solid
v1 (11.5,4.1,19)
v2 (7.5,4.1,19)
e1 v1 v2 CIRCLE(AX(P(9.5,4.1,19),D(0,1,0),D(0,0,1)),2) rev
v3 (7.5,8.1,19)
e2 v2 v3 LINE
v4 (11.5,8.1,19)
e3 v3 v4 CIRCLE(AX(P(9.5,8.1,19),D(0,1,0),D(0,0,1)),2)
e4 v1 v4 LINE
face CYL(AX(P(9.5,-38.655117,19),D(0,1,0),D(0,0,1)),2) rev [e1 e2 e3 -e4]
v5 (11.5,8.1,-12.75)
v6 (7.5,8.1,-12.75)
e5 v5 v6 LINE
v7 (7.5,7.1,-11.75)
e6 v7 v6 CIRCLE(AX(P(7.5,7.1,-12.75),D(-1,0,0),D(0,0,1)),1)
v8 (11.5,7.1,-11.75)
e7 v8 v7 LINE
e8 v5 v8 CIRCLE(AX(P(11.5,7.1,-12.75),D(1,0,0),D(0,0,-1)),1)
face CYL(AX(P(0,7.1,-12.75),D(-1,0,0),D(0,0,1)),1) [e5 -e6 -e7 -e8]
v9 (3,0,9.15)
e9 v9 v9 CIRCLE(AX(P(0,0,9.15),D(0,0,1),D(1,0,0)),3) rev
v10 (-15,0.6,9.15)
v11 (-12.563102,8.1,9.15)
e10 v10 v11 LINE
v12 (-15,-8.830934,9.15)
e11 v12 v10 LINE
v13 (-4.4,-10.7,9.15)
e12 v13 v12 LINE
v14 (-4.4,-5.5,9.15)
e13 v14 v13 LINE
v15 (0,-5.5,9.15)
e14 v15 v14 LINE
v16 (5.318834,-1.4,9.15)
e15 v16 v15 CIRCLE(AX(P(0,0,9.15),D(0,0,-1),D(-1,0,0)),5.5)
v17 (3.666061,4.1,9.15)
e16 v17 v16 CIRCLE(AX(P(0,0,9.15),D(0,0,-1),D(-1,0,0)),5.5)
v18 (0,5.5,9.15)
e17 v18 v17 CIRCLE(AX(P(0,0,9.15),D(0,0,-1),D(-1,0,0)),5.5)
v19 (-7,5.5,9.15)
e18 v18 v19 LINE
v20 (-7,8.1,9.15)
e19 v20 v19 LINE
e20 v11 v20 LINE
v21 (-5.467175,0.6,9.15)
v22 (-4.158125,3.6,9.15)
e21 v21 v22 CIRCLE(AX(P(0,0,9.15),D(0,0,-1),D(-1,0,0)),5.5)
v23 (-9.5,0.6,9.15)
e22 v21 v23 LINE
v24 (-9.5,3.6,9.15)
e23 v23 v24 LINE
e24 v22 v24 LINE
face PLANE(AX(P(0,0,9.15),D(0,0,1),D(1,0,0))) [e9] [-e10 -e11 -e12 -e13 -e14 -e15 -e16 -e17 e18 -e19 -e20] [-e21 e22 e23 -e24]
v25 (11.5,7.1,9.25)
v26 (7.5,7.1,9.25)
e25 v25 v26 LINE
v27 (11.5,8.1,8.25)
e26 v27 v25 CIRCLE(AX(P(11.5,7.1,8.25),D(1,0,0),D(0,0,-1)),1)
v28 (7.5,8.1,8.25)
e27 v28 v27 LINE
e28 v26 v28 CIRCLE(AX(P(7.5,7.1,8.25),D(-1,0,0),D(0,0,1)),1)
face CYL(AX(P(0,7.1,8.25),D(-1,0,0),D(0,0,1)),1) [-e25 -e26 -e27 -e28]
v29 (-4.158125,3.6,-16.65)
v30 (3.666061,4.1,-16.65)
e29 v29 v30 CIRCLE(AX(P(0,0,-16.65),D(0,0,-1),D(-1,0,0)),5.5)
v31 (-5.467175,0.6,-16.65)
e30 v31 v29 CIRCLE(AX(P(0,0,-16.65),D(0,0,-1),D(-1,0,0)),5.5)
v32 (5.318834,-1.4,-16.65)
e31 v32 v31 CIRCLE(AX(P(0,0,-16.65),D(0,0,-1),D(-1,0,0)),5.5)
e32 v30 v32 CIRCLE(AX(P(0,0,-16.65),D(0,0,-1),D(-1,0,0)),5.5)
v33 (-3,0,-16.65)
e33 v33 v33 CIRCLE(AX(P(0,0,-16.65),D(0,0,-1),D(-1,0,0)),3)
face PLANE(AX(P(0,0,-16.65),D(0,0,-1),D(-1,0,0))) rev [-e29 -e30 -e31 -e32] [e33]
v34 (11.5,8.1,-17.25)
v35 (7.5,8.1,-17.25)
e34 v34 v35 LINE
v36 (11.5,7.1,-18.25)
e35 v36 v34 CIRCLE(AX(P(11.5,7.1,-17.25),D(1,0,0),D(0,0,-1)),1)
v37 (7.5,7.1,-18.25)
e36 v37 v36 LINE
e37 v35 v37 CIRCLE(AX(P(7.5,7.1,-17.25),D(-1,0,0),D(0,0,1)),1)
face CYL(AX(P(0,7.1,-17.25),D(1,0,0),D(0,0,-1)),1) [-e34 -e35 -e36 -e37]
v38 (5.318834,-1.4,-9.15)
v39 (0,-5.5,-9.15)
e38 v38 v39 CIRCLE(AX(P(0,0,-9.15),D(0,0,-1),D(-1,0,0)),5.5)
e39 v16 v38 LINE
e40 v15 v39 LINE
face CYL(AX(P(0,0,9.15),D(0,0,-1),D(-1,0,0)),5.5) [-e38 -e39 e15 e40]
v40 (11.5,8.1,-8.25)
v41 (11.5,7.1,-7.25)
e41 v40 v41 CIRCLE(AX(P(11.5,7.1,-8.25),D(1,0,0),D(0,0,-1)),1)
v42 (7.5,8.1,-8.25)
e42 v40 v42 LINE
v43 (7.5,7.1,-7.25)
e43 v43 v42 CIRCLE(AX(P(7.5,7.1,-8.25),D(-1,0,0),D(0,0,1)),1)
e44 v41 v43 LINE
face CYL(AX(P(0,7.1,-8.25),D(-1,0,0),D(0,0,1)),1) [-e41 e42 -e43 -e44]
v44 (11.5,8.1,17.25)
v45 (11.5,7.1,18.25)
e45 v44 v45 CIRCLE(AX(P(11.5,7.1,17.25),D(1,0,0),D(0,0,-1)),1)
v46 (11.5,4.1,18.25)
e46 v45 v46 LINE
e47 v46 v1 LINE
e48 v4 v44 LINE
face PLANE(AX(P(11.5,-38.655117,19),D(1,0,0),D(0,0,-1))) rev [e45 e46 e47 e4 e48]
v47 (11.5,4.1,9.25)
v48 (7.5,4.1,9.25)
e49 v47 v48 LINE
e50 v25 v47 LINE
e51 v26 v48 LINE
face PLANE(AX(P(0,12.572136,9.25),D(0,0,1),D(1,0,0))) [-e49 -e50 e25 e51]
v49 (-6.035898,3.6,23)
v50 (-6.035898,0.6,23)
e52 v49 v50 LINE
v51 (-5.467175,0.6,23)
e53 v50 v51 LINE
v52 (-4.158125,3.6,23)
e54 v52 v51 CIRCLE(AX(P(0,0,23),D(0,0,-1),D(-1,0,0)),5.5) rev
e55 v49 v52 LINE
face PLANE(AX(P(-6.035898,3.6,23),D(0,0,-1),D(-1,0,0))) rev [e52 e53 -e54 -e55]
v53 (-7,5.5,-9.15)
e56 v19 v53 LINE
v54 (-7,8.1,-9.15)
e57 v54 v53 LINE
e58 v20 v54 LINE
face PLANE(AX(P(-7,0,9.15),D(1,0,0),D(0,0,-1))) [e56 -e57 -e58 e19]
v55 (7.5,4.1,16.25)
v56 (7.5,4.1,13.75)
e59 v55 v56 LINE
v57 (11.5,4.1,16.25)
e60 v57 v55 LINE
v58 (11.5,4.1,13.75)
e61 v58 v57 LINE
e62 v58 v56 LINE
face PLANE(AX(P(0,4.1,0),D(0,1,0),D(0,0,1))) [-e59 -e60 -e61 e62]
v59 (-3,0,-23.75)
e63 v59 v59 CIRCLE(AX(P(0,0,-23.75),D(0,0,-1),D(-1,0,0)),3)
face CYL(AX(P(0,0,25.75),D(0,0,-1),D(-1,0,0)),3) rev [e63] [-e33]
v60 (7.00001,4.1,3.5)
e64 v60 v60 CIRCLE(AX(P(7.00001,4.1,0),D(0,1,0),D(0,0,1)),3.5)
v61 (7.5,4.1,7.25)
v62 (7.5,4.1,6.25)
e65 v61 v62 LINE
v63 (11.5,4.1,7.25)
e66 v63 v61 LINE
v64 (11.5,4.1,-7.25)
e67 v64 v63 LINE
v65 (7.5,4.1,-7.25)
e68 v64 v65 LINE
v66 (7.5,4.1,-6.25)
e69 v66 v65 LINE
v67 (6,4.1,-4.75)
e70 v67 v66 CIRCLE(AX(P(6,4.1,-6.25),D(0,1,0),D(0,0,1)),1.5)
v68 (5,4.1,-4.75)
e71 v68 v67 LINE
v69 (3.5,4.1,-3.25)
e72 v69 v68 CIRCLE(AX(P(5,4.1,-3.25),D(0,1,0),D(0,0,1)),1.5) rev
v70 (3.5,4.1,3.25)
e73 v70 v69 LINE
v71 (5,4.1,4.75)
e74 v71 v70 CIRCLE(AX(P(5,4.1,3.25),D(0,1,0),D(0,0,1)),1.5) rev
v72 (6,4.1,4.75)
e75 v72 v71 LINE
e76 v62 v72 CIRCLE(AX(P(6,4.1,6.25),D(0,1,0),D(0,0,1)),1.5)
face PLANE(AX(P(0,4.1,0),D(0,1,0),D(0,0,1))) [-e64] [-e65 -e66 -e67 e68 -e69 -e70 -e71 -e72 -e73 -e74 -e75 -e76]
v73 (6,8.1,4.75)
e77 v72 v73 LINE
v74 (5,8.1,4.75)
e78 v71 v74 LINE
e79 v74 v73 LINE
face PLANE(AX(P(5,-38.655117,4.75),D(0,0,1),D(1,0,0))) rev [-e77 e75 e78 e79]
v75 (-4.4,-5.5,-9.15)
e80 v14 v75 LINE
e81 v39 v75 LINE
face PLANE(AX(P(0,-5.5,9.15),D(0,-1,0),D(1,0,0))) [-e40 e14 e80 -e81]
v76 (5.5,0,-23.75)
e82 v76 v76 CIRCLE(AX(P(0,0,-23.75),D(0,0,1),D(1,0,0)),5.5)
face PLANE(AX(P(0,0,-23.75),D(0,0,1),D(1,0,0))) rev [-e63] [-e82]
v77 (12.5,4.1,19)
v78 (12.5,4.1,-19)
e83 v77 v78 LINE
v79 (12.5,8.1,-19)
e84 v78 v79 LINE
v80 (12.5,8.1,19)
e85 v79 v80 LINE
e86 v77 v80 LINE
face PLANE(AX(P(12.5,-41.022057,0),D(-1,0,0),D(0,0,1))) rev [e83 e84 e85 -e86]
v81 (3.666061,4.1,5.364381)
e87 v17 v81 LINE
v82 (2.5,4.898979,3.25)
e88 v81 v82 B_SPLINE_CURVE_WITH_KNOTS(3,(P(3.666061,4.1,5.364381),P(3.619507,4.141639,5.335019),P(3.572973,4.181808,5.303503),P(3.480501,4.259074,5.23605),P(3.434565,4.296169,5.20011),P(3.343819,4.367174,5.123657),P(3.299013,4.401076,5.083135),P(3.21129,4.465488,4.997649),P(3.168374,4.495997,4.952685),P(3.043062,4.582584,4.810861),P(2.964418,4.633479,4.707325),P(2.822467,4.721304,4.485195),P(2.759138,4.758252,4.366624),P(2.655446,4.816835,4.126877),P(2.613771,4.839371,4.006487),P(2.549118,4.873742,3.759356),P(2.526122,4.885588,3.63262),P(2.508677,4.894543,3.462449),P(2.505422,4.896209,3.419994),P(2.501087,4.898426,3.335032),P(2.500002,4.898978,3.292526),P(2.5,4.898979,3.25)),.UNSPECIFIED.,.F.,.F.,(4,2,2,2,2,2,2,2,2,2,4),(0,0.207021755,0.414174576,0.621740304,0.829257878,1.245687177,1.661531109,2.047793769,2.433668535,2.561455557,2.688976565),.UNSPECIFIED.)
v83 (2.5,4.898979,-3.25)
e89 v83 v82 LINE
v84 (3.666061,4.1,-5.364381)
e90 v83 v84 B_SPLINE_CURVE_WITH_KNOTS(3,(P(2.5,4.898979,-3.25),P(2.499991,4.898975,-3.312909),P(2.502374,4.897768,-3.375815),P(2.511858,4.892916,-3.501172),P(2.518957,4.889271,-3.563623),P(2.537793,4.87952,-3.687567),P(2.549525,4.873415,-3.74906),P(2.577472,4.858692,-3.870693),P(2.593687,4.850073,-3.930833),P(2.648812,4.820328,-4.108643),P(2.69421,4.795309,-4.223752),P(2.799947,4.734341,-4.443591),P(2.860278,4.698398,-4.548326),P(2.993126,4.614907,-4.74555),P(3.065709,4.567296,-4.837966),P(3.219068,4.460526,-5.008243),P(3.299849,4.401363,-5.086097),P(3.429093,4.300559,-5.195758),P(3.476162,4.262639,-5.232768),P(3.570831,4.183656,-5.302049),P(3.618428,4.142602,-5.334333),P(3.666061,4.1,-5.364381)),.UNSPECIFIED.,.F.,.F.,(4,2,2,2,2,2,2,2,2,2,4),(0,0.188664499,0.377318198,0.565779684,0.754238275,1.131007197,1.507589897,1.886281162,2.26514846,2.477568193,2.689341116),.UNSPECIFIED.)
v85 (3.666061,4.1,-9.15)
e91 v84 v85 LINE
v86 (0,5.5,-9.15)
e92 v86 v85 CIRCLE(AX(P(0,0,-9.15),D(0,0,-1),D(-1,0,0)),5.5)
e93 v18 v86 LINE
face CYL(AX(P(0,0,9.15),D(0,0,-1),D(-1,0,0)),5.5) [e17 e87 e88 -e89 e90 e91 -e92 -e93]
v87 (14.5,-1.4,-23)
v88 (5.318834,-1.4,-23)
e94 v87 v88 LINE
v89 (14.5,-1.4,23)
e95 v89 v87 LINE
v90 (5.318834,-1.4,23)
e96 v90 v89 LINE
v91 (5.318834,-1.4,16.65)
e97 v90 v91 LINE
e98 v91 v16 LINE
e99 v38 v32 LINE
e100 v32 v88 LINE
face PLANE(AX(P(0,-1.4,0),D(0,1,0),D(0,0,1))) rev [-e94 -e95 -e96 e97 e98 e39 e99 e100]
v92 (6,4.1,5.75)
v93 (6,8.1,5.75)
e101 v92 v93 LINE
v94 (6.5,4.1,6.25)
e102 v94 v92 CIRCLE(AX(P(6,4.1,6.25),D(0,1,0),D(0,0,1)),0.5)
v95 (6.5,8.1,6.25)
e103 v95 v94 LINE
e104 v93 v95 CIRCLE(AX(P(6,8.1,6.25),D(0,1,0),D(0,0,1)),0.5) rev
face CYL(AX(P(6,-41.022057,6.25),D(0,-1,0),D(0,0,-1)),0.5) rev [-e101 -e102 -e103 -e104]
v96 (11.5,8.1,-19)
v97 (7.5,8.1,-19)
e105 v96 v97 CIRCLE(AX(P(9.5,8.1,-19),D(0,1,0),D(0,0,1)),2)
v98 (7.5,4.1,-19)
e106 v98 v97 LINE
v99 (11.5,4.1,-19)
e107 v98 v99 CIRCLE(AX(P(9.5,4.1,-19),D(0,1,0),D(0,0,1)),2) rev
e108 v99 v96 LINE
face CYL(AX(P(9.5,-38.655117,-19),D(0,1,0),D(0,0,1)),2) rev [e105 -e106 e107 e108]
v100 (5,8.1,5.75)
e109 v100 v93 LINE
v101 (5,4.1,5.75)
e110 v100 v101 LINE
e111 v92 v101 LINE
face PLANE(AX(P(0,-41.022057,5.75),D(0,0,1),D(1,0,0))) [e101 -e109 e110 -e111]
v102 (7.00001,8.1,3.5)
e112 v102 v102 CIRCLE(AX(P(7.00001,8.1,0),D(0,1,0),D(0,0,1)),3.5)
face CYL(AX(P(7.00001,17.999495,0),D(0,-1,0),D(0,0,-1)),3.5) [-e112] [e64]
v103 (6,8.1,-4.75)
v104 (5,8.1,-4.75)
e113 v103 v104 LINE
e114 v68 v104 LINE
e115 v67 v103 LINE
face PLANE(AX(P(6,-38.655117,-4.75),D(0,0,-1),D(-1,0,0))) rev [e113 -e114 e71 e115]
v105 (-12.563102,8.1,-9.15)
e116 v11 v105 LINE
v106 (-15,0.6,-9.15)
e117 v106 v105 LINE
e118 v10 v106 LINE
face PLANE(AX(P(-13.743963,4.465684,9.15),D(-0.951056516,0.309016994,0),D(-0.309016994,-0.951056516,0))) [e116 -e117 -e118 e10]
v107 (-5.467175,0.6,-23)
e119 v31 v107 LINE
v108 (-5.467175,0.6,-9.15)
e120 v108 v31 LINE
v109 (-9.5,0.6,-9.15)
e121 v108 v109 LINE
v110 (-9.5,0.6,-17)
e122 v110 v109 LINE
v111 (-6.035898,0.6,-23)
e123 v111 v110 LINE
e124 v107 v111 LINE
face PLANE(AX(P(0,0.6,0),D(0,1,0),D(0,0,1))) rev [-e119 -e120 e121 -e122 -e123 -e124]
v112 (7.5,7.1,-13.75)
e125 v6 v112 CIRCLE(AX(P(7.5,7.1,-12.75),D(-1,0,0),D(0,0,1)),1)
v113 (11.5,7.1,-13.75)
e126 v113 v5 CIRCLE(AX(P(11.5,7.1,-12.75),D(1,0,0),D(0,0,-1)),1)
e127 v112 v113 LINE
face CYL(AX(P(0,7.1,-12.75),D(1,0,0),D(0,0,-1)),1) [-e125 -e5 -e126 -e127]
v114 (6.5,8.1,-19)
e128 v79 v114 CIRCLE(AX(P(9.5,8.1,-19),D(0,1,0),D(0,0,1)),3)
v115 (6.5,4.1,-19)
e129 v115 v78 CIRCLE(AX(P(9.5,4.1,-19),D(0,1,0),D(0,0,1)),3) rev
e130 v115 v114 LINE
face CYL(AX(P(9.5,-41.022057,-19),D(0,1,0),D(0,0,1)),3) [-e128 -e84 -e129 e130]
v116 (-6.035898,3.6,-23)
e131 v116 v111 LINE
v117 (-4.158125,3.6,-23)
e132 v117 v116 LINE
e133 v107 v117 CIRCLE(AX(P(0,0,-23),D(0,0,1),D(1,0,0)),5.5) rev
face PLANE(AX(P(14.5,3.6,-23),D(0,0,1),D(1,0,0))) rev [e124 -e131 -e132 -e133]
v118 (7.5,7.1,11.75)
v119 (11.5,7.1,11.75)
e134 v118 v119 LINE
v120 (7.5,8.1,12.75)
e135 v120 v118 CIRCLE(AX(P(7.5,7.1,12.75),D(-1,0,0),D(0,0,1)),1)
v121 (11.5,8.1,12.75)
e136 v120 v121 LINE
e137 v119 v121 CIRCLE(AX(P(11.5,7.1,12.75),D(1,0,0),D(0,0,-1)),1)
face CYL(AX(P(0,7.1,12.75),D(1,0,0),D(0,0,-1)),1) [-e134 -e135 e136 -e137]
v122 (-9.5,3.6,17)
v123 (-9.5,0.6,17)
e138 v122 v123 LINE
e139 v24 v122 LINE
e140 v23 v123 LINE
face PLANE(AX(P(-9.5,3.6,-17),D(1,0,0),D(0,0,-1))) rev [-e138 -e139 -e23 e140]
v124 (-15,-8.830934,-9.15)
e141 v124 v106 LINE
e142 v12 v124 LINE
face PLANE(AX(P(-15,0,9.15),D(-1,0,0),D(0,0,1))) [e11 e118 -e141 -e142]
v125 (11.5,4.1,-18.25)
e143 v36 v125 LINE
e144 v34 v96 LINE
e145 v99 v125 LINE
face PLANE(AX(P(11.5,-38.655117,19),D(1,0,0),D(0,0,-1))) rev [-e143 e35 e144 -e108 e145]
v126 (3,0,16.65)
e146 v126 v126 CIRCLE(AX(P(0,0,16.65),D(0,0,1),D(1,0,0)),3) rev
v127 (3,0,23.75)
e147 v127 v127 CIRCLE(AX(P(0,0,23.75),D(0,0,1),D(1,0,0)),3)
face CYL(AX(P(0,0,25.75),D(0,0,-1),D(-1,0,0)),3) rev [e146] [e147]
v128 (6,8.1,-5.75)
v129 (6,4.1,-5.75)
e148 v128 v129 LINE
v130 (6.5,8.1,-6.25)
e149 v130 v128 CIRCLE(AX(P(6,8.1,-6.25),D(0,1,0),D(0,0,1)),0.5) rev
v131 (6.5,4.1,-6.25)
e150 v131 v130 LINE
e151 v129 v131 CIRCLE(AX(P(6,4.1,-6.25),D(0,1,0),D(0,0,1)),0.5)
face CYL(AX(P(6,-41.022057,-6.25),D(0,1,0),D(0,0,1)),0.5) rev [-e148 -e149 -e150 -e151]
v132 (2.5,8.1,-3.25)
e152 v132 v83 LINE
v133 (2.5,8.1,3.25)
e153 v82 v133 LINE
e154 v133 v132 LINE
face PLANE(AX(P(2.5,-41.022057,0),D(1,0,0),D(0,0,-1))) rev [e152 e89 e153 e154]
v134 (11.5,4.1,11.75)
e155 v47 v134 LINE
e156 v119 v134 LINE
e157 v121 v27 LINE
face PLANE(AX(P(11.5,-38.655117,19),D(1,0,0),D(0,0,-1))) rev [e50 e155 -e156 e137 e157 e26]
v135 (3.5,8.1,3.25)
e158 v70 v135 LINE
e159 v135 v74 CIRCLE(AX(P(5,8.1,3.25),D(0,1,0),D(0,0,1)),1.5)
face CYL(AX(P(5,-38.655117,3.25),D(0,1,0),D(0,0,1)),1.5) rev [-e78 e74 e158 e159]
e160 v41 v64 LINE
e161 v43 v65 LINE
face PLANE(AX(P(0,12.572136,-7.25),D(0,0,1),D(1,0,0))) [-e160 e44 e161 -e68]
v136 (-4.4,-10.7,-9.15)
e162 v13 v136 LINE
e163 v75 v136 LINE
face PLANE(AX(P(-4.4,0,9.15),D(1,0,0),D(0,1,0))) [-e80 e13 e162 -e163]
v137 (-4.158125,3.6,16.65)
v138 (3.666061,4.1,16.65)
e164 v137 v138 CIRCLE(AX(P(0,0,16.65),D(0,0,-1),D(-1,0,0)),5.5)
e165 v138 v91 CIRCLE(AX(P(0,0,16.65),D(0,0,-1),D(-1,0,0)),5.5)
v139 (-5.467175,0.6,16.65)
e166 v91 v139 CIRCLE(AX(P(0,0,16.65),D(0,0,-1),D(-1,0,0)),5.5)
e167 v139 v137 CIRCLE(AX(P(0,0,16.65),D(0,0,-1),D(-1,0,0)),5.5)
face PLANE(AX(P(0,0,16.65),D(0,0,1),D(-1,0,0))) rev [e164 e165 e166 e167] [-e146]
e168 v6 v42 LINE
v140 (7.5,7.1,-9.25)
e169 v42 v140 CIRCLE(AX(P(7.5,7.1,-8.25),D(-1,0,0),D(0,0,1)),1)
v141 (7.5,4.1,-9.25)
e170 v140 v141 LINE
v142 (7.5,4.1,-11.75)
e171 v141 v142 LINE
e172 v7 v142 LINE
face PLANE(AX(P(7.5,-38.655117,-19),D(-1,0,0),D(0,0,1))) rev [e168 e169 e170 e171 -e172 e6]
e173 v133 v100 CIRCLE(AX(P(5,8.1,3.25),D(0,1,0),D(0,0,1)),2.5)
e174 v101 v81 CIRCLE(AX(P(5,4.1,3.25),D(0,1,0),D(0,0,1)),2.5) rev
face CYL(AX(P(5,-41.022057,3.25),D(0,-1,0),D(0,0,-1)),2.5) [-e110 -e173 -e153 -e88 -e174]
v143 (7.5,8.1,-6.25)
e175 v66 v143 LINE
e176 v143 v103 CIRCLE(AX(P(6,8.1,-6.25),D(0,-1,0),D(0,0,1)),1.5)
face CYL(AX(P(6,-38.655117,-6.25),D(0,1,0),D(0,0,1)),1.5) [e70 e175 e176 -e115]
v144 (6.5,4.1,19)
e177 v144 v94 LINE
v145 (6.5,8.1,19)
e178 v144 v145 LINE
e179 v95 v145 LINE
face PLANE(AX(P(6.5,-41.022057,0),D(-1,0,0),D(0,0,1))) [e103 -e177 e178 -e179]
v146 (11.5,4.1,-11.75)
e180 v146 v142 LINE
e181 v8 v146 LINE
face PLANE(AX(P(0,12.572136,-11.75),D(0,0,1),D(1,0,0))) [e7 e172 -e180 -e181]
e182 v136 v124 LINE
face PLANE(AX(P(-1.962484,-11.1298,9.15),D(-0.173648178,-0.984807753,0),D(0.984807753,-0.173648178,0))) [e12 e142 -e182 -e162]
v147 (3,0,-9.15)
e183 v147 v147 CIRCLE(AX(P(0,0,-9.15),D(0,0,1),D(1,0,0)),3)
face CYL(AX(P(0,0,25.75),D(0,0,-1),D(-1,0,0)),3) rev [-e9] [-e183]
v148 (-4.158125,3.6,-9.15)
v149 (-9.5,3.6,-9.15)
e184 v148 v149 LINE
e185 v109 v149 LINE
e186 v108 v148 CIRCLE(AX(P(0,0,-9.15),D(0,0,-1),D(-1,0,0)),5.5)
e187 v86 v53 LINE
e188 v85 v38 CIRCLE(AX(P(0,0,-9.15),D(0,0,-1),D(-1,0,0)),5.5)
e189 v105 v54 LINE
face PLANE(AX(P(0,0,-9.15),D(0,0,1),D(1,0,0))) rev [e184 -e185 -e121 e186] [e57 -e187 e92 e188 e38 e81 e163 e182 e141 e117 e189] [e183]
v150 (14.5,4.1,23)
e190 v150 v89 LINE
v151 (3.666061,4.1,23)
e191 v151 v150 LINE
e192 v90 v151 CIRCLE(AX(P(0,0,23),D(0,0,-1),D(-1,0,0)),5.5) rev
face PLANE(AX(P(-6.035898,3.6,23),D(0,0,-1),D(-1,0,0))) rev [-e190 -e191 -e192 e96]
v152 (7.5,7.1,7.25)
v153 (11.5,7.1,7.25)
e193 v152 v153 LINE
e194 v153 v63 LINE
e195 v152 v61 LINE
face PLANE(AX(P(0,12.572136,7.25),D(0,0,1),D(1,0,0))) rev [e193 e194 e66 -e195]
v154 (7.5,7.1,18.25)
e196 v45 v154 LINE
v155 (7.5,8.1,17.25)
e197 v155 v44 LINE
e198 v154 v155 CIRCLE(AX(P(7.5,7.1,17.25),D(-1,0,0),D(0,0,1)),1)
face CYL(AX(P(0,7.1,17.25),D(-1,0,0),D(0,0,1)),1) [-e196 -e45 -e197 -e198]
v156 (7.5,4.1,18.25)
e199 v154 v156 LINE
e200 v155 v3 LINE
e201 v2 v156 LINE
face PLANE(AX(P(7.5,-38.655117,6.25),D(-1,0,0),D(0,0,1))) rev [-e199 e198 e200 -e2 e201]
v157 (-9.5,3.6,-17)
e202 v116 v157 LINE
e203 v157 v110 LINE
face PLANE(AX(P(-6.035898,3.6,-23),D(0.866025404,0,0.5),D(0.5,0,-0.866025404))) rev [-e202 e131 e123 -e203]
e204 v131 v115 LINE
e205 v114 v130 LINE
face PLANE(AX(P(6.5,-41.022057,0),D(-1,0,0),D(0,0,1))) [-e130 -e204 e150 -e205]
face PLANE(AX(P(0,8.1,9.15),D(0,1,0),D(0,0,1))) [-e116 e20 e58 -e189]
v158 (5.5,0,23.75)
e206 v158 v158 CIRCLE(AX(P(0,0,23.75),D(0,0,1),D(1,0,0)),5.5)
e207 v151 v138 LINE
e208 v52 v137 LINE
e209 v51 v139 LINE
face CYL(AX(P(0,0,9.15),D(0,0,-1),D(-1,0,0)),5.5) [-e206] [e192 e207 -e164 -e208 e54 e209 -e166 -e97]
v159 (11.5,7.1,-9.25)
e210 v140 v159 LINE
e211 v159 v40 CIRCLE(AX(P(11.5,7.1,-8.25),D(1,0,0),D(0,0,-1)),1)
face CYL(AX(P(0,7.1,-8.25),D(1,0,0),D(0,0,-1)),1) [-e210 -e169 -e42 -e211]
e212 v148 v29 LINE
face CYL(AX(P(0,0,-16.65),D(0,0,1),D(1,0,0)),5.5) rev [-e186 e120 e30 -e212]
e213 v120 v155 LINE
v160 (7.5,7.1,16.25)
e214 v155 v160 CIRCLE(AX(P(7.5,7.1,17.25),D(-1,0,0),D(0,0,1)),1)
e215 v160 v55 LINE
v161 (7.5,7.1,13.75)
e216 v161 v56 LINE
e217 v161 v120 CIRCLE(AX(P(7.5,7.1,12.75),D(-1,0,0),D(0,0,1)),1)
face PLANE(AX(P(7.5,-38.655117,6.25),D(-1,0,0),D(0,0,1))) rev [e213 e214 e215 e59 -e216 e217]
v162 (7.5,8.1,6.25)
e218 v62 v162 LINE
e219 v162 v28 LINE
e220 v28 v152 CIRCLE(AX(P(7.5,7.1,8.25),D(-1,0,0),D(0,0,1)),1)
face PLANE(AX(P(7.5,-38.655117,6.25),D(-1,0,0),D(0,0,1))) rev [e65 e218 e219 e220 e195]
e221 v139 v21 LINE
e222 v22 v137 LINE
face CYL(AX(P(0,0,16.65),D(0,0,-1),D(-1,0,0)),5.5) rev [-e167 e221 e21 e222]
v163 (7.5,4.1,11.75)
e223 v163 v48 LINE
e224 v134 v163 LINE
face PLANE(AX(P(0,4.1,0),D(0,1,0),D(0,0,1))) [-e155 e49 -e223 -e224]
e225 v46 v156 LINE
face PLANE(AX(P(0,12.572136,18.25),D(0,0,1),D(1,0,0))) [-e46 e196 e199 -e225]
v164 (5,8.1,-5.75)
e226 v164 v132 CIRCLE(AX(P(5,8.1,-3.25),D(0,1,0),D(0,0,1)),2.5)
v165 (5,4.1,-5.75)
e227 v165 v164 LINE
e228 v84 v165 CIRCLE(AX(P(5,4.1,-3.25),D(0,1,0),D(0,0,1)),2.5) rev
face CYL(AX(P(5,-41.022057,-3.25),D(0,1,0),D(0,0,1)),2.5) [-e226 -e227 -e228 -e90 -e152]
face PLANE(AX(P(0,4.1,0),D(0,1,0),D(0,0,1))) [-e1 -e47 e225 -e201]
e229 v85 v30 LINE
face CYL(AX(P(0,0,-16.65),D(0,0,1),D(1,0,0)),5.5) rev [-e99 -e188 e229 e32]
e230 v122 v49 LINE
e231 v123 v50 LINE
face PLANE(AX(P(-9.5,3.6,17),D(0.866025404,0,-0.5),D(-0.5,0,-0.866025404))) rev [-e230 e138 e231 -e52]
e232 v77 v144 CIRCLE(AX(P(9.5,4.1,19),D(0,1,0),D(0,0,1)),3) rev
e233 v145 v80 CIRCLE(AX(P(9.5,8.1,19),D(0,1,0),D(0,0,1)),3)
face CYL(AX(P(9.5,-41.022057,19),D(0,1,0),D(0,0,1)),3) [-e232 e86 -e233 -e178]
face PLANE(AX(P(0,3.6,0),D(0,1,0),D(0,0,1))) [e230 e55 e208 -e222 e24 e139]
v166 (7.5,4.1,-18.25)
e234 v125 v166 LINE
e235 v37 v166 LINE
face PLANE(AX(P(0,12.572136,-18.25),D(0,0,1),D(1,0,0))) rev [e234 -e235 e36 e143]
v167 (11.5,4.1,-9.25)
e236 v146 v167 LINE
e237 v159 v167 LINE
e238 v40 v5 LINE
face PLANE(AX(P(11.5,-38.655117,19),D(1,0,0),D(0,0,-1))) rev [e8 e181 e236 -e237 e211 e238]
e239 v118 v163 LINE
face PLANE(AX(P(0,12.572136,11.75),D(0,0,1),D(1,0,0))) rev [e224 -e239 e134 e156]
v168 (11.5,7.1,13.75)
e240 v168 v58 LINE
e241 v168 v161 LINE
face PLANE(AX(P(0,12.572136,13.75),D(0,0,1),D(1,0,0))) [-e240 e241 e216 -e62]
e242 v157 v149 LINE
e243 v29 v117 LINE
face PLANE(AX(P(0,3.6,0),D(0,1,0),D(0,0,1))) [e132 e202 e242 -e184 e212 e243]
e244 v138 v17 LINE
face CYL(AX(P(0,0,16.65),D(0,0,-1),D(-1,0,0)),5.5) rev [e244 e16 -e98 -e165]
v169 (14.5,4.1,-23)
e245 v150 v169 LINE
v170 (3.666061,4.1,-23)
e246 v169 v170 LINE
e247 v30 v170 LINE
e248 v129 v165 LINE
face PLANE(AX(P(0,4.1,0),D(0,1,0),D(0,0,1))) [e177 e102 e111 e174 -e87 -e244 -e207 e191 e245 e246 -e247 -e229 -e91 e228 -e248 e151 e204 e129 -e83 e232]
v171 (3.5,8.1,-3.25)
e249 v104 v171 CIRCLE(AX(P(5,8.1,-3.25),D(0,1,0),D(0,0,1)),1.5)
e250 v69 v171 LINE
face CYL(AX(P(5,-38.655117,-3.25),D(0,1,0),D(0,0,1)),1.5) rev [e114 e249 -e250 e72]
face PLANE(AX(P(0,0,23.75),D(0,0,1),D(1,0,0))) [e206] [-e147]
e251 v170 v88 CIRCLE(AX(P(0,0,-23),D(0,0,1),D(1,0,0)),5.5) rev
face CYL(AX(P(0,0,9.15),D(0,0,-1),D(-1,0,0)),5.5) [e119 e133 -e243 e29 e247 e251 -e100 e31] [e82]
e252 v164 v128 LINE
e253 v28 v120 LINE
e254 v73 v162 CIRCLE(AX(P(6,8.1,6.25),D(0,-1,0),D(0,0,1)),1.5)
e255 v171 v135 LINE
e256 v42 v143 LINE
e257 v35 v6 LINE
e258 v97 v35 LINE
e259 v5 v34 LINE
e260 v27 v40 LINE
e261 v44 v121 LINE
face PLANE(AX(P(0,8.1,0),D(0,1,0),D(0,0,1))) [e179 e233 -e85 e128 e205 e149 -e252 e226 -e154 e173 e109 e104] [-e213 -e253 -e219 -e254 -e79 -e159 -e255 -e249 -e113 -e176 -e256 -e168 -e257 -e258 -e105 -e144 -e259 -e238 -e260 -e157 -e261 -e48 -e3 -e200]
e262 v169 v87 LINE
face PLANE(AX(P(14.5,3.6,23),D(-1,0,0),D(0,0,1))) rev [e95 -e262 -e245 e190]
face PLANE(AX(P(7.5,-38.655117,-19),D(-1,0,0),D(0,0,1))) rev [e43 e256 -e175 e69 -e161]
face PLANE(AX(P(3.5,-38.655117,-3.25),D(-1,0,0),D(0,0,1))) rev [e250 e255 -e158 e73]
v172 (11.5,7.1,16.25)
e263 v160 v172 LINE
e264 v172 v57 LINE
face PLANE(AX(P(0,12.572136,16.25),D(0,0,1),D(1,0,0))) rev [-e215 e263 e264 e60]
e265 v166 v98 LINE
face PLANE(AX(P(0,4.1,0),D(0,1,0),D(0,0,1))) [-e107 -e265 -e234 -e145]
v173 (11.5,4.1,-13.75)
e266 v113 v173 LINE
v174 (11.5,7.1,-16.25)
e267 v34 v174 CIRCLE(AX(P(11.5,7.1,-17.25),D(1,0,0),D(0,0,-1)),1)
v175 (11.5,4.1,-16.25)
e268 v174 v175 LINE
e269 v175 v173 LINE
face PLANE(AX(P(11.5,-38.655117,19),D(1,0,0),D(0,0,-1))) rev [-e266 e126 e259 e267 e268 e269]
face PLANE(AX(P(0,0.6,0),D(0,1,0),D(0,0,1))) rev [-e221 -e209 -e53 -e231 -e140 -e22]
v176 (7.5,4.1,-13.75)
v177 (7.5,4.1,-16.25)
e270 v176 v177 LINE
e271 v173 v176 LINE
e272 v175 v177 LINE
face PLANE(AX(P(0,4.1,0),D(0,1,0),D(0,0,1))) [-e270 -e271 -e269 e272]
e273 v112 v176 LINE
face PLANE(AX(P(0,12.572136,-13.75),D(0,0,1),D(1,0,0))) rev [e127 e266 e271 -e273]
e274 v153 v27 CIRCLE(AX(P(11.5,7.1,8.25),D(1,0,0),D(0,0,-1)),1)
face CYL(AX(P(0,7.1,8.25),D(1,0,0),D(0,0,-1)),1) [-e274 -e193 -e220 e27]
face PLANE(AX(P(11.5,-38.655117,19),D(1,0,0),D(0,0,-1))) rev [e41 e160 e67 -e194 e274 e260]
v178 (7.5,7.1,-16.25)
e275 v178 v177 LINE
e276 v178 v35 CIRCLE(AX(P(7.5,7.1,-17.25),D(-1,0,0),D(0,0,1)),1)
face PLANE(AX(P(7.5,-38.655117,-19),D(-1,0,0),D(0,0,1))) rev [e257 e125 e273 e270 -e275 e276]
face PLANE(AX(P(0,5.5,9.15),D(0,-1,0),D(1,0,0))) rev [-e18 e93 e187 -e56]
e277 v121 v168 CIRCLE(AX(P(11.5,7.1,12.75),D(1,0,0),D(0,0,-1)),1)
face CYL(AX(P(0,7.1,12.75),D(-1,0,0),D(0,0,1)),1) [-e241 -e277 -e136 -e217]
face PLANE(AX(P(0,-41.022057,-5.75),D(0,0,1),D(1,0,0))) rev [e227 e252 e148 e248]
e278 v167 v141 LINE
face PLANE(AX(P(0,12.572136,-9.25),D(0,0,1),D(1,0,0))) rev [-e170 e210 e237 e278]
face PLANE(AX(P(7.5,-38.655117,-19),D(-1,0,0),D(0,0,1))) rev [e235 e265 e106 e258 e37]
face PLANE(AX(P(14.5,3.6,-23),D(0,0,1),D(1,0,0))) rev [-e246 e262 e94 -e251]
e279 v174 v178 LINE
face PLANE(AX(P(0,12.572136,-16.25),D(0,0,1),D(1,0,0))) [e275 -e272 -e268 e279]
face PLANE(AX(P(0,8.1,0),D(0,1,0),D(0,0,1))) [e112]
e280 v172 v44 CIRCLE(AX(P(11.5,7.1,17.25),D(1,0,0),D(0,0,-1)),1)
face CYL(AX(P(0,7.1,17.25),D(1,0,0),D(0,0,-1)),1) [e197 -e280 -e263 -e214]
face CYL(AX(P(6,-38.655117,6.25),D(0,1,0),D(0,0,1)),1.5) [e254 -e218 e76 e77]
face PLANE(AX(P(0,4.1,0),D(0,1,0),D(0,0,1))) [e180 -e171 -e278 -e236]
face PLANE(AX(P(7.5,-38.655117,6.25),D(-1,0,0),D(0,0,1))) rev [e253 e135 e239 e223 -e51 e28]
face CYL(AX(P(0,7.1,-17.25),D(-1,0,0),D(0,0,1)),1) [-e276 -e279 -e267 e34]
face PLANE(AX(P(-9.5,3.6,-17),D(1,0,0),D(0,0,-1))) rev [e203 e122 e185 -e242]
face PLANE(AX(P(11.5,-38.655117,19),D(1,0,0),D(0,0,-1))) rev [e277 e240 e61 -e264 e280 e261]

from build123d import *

# Parameters (mm, degrees)
BOSS_EXTRUDE1_DEPTH    = 9.15
BOSS_EXTRUDE2_DEPTH    = 3
BOSS_EXTRUDE3_START    = -23
SKETCH4_R              = 5.5
BOSS_EXTRUDE3_DEPTH    = 23.75
MOVE_START             = 3.6
MOVE_FACE1_OUTLINE_W   = 12.5
MOVE_FACE1_OUTLINE_H   = 46
MOVE_FACE1_DEPTH       = 0.5
MOVE_START_2           = -1.4
MOVE_FACE2_OUTLINE_W   = 10.5
MOVE_FACE2_OUTLINE_H   = 46
MOVE_FACE2_DEPTH       = 2
SKETCH7_R              = 5.5
CUT_EXTRUDE1_DEPTH     = 7.5
HOLE2_START            = -23.75
HOLE2_OUTLINE_R        = 3
HOLE2_DEPTH            = 47.5
BOSS_EXTRUDE4_REACH    = 35.801
SKETCH10_W             = 4
SKETCH10_H             = 11.5
FILLET1_R              = 2.5
FILLET3_R              = 0.5
CUT_EXTRUDE2_DEPTH     = 4
SKETCH12_W             = 6
SKETCH12_H             = 2
BOSS_EXTRUDE5_DEPTH    = 4
FILLET2_R              = 1
LPATTERN2_COUNT        = 3
LPATTERN2_PITCH        = 4.5
FILLET2_OF_LPATTERN2_R = 1
SKETCH13_R             = 3.5
BOSS_EXTRUDE13_DEPTH   = 4
MIRROR1_START          = 7.5
MIRROR1_DEPTH          = 4
MIRROR1_START_2        = 9.15
MIRROR1_2_OUTLINE_R    = 3
MIRROR1_2_DEPTH        = 7.5


# Read off the part's stored shape, not the designer's step: Move Face1, Move Face2, Hole2, Mirror1
# Some blends are built 0.0001 mm under size
with BuildPart() as part:
    # Sketch1 → Boss-Extrude1 (new, symmetric)
    with BuildSketch(Plane.XY):
        with BuildLine():
            Line((-4.4, -5.5), (0, -5.5))
            ThreePointArc((0, -5.5), (5.5, 0), (0, 5.5))
            Line((0, 5.5), (-7, 5.5))
            Line((-7, 5.5), (-7, 8.1))
            Line((-7, 8.1), (-12.563102278, 8.1))
            Line((-12.563102278, 8.1), (-15, 0.6))
            Line((-15, 0.6), (-15, -8.830934004))
            Line((-15, -8.830934004), (-4.4, -10.7))
            Line((-4.4, -10.7), (-4.4, -5.5))
        make_face()
    extrude(amount=BOSS_EXTRUDE1_DEPTH, both=True)

    # Sketch3 → Boss-Extrude2 (add)
    with BuildSketch(Plane(origin=(0, 0.6, 0), x_dir=(0, 0, -1), z_dir=(0, 1, 0))):
        Polygon((17, 9.5), (-17, 9.5), (-23, 6.035898385), (-23, -14.5), (23, -14.5), (23, 6.035898385), align=None)
    extrude(amount=BOSS_EXTRUDE2_DEPTH)

    # Sketch4 → Boss-Extrude3 (add, symmetric)
    with BuildSketch(Plane(origin=(0, 0, -23), x_dir=(-1, 0, 0), z_dir=(0, 0, -1)).offset(BOSS_EXTRUDE3_START)):
        with Locations(Location((0, 0, 0), (0, 0, 180))):
            Circle(SKETCH4_R)
    extrude(amount=BOSS_EXTRUDE3_DEPTH, both=True)

    # Move Face1 outline → Move Face1 (add)
    with BuildSketch(Plane(origin=(0, 0, 0), x_dir=(1, 0, 0), z_dir=(0, 1, 0)).offset(MOVE_START)):
        with Locations((8.25, 0)):
            Rectangle(MOVE_FACE1_OUTLINE_W, MOVE_FACE1_OUTLINE_H)
    extrude(amount=MOVE_FACE1_DEPTH)

    # Move Face2 outline → Move Face2 (add)
    with BuildSketch(Plane(origin=(0, 0, 0), x_dir=(1, 0, 0), z_dir=(0, 1, 0)).offset(MOVE_START_2)):
        with Locations((9.25, 0)):
            Rectangle(MOVE_FACE2_OUTLINE_W, MOVE_FACE2_OUTLINE_H)
    extrude(amount=MOVE_FACE2_DEPTH)

    # Sketch7 → Cut-Extrude1 (cut)
    with BuildSketch(Plane(origin=(0, 0, -9.15), x_dir=(-1, 0, 0), z_dir=(0, 0, -1))):
        with Locations(Location((0, 0, 0), (0, 0, 6.262913126))):
            Circle(SKETCH7_R)
    extrude(amount=CUT_EXTRUDE1_DEPTH, mode=Mode.SUBTRACT)

    # Hole2 outline → Hole2 (cut)
    with BuildSketch(Plane.XY.offset(HOLE2_START)):
        Circle(HOLE2_OUTLINE_R)
    extrude(amount=HOLE2_DEPTH, mode=Mode.SUBTRACT)

    # Boss-Extrude4: up to this face of the body (flat: up to its plane)
    boss_extrude4_end = Plane(part.part.faces().sort_by_distance((9.083030278, 4.1, 0))[0])
    # Sketch10 → Boss-Extrude4 (add, up to the picked face)
    with BuildSketch(Plane(origin=(0, 8.1, 0), x_dir=(1, 0, 0), z_dir=(0, 1, 0)), mode=Mode.PRIVATE) as boss_extrude4_sk1:
        with BuildLine():
            Line((12.5, -19), (12.5, 19))
            ThreePointArc((12.5, 19), (9.5, 22), (6.5, 19))
            Line((6.5, 19), (6.5, 5.75))
            Line((6.5, 5.75), (10.5, 5.75))
            Line((10.5, 5.75), (10.5, -5.75))
            Line((10.5, -5.75), (6.5, -5.75))
            Line((6.5, -5.75), (6.5, -19))
            ThreePointArc((6.5, -19), (9.5, -22), (12.5, -19))
        make_face()
    boss_extrude4_tool1 = split(extrude(boss_extrude4_sk1.sketch, amount=-BOSS_EXTRUDE4_REACH, mode=Mode.PRIVATE), bisect_by=boss_extrude4_end, keep=Keep.BOTH, mode=Mode.PRIVATE)
    # Sketch10 → Boss-Extrude4 (add, up to the picked face)
    with BuildSketch(Plane(origin=(0, 8.1, 0), x_dir=(1, 0, 0), z_dir=(0, 1, 0)), mode=Mode.PRIVATE) as boss_extrude4_sk2:
        with Locations((8.5, 0)):
            Rectangle(SKETCH10_W, SKETCH10_H)
    boss_extrude4_tool2 = split(extrude(boss_extrude4_sk2.sketch, amount=-BOSS_EXTRUDE4_REACH, mode=Mode.PRIVATE), bisect_by=boss_extrude4_end, keep=Keep.BOTH, mode=Mode.PRIVATE)
    # Sketch10 → Boss-Extrude4 (add, up to the picked face)
    with BuildSketch(Plane(origin=(0, 8.1, 0), x_dir=(1, 0, 0), z_dir=(0, 1, 0)), mode=Mode.PRIVATE) as boss_extrude4_sk3:
        with Locations((4.5, 0)):
            Rectangle(SKETCH10_W, SKETCH10_H)
    boss_extrude4_tool3 = split(extrude(boss_extrude4_sk3.sketch, amount=-BOSS_EXTRUDE4_REACH, mode=Mode.PRIVATE), bisect_by=boss_extrude4_end, keep=Keep.BOTH, mode=Mode.PRIVATE)
    add(boss_extrude4_tool1.solids().sort_by(Axis((12.055928, 8.1, 0), (0, -1, 0)))[0])
    add(boss_extrude4_tool2.solids().sort_by(Axis((8.5, 8.1, 0), (0, -1, 0)))[0])
    add(boss_extrude4_tool3.solids().sort_by(Axis((4.5, 8.1, 0), (0, -1, 0)))[0])

    # Fillet1
    # the kernel refuses this fillet: 2.5 mm, written as the material it takes off along each edge
    with BuildSketch(Plane(origin=(2.5, 14.35, -5.75), x_dir=(1, 0, 0), z_dir=(0, -1, 0))) as fillet1_piece_1_section:
        with BuildLine():
            CenterArc((FILLET1_R, FILLET1_R), FILLET1_R, 180, 90)
            Line((0, FILLET1_R), (0, 0))
            Line((0, 0), (FILLET1_R, 0))
        make_face()
    fillet1_piece_1 = extrude(amount=15.701020514, mode=Mode.PRIVATE)
    fillet1_piece_1 = fillet1_piece_1 - Plane(origin=(0, 0, -5.193529693), x_dir=(0, -1, 0), z_dir=(0, 0, 1)) * Cylinder(5.5, 42, mode=Mode.PRIVATE)
    fillet1_piece_1 = split(fillet1_piece_1, bisect_by=Plane(origin=(3.08088975, 4.1, -5.193529693), z_dir=(0, 1, 0)), keep=Keep.TOP, mode=Mode.PRIVATE)
    add(fillet1_piece_1, mode=Mode.SUBTRACT)
    with BuildSketch(Plane(origin=(2.5, 14.35, 5.75), x_dir=(0, 0, -1), z_dir=(0, -1, 0))) as fillet1_piece_2_section:
        with BuildLine():
            CenterArc((FILLET1_R, FILLET1_R), FILLET1_R, 180, 90)
            Line((0, FILLET1_R), (0, 0))
            Line((0, 0), (FILLET1_R, 0))
        make_face()
    fillet1_piece_2 = extrude(amount=15.701020514, mode=Mode.PRIVATE)
    fillet1_piece_2 = fillet1_piece_2 - Plane(origin=(0, 0, 5.193529696), x_dir=(0, -1, 0), z_dir=(0, 0, 1)) * Cylinder(5.5, 42, mode=Mode.PRIVATE)
    fillet1_piece_2 = split(fillet1_piece_2, bisect_by=Plane(origin=(3.080889748, 4.1, 5.193529696), z_dir=(0, 1, 0)), keep=Keep.TOP, mode=Mode.PRIVATE)
    add(fillet1_piece_2, mode=Mode.SUBTRACT)

    # Fillet3
    fillet3_edges = [part.edges().sort_by_distance(p)[0] for p in [
        (6.5, 6.1, 5.75),
        (6.5, 6.1, -5.75),
    ]]
    fillet(fillet3_edges, radius=FILLET3_R)

    # Sketch11 → Cut-Extrude2 (cut)
    with BuildSketch(Plane(origin=(0, 8.1, 0), x_dir=(1, 0, 0), z_dir=(0, 1, 0))):
        with BuildLine():
            Line((6, 4.75), (5, 4.75))
            ThreePointArc((5, 4.75), (3.939339828, 4.310660172), (3.5, 3.25))
            Line((3.5, 3.25), (3.5, -3.25))
            ThreePointArc((3.5, -3.25), (3.939339828, -4.310660172), (5, -4.75))
            Line((5, -4.75), (6, -4.75))
            ThreePointArc((6, -4.75), (7.060660172, -5.189339828), (7.5, -6.25))
            Line((7.5, -6.25), (7.5, -19))
            ThreePointArc((7.5, -19), (9.5, -21), (11.5, -19))
            Line((11.5, -19), (11.5, 19))
            ThreePointArc((11.5, 19), (9.5, 21), (7.5, 19))
            Line((7.5, 19), (7.5, 6.25))
            ThreePointArc((7.5, 6.25), (7.060660172, 5.189339828), (6, 4.75))
        make_face()
    extrude(amount=-CUT_EXTRUDE2_DEPTH, mode=Mode.SUBTRACT)

    # Sketch12 → Boss-Extrude5 (add)
    with BuildSketch(Plane(origin=(0, 4.1, 0), x_dir=(1, 0, 0), z_dir=(0, 1, 0))):
        with Locations((9.5, 17.25)):
            Rectangle(SKETCH12_W, SKETCH12_H)
    boss_extrude5 = extrude(amount=BOSS_EXTRUDE5_DEPTH)

    # Fillet2
    fillet2_edges = [part.edges().sort_by_distance(p)[0] for p in [
        (9.5, 8.1, -18.25),
        (9.5, 8.1, -16.25),
    ]]
    fillet(fillet2_edges, radius=FILLET2_R - 0.0001)  # a hair under: the kernel refuses the full size

    # LPattern2: Boss-Extrude5 ×3
    with Locations(*[(0, 0, i * LPATTERN2_PITCH) for i in range(1, LPATTERN2_COUNT)]):
        add(boss_extrude5)

    # Fillet2 of LPattern2
    fillet2_of_lpattern2_edges = [part.edges().sort_by_distance(p)[0] for p in [
        (9.5, 8.1, -13.75),
        (9.5, 8.1, -11.75),
        (9.5, 8.1, -9.25),
        (9.5, 8.1, -7.25),
    ]]
    fillet(fillet2_of_lpattern2_edges, radius=FILLET2_OF_LPATTERN2_R - 0.0001)  # a hair under: the kernel refuses the full size

    # Sketch13 → Boss-Extrude13 (add)
    with BuildSketch(Plane(origin=(0, 4.1, 0), x_dir=(1, 0, 0), z_dir=(0, 1, 0))):
        with Locations(Location((7.00001, 0, 0), (0, 0, 270))):
            Circle(SKETCH13_R)
    extrude(amount=BOSS_EXTRUDE13_DEPTH)

    # Mirror1 outline → Mirror1 (add)
    with BuildSketch(Plane.YZ.offset(MIRROR1_START)):
        with BuildLine():
            ThreePointArc((8.1, 17.25), (7.807106781, 17.957106781), (7.1, 18.25))
            Line((7.1, 18.25), (4.1, 18.25))
            Line((4.1, 18.25), (4.1, 16.25))
            Line((4.1, 16.25), (7.1, 16.25))
            ThreePointArc((7.1, 16.25), (7.807106781, 16.542893219), (8.1, 17.25))
        make_face()
        with BuildLine():
            Line((7.1, 9.25), (4.1, 9.25))
            Line((4.1, 9.25), (4.1, 7.25))
            Line((4.1, 7.25), (7.1, 7.25))
            ThreePointArc((7.1, 7.25), (7.807106781, 7.542893219), (8.1, 8.25))
            ThreePointArc((8.1, 8.25), (7.807106781, 8.957106781), (7.1, 9.25))
        make_face()
        with BuildLine():
            Line((7.1, 13.75), (4.1, 13.75))
            Line((4.1, 13.75), (4.1, 11.75))
            Line((4.1, 11.75), (7.1, 11.75))
            ThreePointArc((7.1, 11.75), (7.807106781, 12.042893219), (8.1, 12.75))
            ThreePointArc((8.1, 12.75), (7.807106781, 13.457106781), (7.1, 13.75))
        make_face()
    extrude(amount=MIRROR1_DEPTH)

    # Mirror1 2 outline → Mirror1 2 (cut)
    with BuildSketch(Plane.XY.offset(MIRROR1_START_2)):
        with BuildLine():
            ThreePointArc((5.318834459, -1.4), (5.267312845, 1.582850401), (3.666060556, 4.1))
            ThreePointArc((3.666060556, 4.1), (-0.350758821, 5.4888039), (-4.158124577, 3.6))
            ThreePointArc((-4.158124577, 3.6), (-5.040991658, 2.199637039), (-5.467174773, 0.6))
            ThreePointArc((-5.467174773, 0.6), (-1.002746834, -5.407818302), (5.318834459, -1.4))
        make_face()
        Circle(MIRROR1_2_OUTLINE_R, mode=Mode.SUBTRACT)
    extrude(amount=MIRROR1_2_DEPTH, mode=Mode.SUBTRACT)


solid = part.part
